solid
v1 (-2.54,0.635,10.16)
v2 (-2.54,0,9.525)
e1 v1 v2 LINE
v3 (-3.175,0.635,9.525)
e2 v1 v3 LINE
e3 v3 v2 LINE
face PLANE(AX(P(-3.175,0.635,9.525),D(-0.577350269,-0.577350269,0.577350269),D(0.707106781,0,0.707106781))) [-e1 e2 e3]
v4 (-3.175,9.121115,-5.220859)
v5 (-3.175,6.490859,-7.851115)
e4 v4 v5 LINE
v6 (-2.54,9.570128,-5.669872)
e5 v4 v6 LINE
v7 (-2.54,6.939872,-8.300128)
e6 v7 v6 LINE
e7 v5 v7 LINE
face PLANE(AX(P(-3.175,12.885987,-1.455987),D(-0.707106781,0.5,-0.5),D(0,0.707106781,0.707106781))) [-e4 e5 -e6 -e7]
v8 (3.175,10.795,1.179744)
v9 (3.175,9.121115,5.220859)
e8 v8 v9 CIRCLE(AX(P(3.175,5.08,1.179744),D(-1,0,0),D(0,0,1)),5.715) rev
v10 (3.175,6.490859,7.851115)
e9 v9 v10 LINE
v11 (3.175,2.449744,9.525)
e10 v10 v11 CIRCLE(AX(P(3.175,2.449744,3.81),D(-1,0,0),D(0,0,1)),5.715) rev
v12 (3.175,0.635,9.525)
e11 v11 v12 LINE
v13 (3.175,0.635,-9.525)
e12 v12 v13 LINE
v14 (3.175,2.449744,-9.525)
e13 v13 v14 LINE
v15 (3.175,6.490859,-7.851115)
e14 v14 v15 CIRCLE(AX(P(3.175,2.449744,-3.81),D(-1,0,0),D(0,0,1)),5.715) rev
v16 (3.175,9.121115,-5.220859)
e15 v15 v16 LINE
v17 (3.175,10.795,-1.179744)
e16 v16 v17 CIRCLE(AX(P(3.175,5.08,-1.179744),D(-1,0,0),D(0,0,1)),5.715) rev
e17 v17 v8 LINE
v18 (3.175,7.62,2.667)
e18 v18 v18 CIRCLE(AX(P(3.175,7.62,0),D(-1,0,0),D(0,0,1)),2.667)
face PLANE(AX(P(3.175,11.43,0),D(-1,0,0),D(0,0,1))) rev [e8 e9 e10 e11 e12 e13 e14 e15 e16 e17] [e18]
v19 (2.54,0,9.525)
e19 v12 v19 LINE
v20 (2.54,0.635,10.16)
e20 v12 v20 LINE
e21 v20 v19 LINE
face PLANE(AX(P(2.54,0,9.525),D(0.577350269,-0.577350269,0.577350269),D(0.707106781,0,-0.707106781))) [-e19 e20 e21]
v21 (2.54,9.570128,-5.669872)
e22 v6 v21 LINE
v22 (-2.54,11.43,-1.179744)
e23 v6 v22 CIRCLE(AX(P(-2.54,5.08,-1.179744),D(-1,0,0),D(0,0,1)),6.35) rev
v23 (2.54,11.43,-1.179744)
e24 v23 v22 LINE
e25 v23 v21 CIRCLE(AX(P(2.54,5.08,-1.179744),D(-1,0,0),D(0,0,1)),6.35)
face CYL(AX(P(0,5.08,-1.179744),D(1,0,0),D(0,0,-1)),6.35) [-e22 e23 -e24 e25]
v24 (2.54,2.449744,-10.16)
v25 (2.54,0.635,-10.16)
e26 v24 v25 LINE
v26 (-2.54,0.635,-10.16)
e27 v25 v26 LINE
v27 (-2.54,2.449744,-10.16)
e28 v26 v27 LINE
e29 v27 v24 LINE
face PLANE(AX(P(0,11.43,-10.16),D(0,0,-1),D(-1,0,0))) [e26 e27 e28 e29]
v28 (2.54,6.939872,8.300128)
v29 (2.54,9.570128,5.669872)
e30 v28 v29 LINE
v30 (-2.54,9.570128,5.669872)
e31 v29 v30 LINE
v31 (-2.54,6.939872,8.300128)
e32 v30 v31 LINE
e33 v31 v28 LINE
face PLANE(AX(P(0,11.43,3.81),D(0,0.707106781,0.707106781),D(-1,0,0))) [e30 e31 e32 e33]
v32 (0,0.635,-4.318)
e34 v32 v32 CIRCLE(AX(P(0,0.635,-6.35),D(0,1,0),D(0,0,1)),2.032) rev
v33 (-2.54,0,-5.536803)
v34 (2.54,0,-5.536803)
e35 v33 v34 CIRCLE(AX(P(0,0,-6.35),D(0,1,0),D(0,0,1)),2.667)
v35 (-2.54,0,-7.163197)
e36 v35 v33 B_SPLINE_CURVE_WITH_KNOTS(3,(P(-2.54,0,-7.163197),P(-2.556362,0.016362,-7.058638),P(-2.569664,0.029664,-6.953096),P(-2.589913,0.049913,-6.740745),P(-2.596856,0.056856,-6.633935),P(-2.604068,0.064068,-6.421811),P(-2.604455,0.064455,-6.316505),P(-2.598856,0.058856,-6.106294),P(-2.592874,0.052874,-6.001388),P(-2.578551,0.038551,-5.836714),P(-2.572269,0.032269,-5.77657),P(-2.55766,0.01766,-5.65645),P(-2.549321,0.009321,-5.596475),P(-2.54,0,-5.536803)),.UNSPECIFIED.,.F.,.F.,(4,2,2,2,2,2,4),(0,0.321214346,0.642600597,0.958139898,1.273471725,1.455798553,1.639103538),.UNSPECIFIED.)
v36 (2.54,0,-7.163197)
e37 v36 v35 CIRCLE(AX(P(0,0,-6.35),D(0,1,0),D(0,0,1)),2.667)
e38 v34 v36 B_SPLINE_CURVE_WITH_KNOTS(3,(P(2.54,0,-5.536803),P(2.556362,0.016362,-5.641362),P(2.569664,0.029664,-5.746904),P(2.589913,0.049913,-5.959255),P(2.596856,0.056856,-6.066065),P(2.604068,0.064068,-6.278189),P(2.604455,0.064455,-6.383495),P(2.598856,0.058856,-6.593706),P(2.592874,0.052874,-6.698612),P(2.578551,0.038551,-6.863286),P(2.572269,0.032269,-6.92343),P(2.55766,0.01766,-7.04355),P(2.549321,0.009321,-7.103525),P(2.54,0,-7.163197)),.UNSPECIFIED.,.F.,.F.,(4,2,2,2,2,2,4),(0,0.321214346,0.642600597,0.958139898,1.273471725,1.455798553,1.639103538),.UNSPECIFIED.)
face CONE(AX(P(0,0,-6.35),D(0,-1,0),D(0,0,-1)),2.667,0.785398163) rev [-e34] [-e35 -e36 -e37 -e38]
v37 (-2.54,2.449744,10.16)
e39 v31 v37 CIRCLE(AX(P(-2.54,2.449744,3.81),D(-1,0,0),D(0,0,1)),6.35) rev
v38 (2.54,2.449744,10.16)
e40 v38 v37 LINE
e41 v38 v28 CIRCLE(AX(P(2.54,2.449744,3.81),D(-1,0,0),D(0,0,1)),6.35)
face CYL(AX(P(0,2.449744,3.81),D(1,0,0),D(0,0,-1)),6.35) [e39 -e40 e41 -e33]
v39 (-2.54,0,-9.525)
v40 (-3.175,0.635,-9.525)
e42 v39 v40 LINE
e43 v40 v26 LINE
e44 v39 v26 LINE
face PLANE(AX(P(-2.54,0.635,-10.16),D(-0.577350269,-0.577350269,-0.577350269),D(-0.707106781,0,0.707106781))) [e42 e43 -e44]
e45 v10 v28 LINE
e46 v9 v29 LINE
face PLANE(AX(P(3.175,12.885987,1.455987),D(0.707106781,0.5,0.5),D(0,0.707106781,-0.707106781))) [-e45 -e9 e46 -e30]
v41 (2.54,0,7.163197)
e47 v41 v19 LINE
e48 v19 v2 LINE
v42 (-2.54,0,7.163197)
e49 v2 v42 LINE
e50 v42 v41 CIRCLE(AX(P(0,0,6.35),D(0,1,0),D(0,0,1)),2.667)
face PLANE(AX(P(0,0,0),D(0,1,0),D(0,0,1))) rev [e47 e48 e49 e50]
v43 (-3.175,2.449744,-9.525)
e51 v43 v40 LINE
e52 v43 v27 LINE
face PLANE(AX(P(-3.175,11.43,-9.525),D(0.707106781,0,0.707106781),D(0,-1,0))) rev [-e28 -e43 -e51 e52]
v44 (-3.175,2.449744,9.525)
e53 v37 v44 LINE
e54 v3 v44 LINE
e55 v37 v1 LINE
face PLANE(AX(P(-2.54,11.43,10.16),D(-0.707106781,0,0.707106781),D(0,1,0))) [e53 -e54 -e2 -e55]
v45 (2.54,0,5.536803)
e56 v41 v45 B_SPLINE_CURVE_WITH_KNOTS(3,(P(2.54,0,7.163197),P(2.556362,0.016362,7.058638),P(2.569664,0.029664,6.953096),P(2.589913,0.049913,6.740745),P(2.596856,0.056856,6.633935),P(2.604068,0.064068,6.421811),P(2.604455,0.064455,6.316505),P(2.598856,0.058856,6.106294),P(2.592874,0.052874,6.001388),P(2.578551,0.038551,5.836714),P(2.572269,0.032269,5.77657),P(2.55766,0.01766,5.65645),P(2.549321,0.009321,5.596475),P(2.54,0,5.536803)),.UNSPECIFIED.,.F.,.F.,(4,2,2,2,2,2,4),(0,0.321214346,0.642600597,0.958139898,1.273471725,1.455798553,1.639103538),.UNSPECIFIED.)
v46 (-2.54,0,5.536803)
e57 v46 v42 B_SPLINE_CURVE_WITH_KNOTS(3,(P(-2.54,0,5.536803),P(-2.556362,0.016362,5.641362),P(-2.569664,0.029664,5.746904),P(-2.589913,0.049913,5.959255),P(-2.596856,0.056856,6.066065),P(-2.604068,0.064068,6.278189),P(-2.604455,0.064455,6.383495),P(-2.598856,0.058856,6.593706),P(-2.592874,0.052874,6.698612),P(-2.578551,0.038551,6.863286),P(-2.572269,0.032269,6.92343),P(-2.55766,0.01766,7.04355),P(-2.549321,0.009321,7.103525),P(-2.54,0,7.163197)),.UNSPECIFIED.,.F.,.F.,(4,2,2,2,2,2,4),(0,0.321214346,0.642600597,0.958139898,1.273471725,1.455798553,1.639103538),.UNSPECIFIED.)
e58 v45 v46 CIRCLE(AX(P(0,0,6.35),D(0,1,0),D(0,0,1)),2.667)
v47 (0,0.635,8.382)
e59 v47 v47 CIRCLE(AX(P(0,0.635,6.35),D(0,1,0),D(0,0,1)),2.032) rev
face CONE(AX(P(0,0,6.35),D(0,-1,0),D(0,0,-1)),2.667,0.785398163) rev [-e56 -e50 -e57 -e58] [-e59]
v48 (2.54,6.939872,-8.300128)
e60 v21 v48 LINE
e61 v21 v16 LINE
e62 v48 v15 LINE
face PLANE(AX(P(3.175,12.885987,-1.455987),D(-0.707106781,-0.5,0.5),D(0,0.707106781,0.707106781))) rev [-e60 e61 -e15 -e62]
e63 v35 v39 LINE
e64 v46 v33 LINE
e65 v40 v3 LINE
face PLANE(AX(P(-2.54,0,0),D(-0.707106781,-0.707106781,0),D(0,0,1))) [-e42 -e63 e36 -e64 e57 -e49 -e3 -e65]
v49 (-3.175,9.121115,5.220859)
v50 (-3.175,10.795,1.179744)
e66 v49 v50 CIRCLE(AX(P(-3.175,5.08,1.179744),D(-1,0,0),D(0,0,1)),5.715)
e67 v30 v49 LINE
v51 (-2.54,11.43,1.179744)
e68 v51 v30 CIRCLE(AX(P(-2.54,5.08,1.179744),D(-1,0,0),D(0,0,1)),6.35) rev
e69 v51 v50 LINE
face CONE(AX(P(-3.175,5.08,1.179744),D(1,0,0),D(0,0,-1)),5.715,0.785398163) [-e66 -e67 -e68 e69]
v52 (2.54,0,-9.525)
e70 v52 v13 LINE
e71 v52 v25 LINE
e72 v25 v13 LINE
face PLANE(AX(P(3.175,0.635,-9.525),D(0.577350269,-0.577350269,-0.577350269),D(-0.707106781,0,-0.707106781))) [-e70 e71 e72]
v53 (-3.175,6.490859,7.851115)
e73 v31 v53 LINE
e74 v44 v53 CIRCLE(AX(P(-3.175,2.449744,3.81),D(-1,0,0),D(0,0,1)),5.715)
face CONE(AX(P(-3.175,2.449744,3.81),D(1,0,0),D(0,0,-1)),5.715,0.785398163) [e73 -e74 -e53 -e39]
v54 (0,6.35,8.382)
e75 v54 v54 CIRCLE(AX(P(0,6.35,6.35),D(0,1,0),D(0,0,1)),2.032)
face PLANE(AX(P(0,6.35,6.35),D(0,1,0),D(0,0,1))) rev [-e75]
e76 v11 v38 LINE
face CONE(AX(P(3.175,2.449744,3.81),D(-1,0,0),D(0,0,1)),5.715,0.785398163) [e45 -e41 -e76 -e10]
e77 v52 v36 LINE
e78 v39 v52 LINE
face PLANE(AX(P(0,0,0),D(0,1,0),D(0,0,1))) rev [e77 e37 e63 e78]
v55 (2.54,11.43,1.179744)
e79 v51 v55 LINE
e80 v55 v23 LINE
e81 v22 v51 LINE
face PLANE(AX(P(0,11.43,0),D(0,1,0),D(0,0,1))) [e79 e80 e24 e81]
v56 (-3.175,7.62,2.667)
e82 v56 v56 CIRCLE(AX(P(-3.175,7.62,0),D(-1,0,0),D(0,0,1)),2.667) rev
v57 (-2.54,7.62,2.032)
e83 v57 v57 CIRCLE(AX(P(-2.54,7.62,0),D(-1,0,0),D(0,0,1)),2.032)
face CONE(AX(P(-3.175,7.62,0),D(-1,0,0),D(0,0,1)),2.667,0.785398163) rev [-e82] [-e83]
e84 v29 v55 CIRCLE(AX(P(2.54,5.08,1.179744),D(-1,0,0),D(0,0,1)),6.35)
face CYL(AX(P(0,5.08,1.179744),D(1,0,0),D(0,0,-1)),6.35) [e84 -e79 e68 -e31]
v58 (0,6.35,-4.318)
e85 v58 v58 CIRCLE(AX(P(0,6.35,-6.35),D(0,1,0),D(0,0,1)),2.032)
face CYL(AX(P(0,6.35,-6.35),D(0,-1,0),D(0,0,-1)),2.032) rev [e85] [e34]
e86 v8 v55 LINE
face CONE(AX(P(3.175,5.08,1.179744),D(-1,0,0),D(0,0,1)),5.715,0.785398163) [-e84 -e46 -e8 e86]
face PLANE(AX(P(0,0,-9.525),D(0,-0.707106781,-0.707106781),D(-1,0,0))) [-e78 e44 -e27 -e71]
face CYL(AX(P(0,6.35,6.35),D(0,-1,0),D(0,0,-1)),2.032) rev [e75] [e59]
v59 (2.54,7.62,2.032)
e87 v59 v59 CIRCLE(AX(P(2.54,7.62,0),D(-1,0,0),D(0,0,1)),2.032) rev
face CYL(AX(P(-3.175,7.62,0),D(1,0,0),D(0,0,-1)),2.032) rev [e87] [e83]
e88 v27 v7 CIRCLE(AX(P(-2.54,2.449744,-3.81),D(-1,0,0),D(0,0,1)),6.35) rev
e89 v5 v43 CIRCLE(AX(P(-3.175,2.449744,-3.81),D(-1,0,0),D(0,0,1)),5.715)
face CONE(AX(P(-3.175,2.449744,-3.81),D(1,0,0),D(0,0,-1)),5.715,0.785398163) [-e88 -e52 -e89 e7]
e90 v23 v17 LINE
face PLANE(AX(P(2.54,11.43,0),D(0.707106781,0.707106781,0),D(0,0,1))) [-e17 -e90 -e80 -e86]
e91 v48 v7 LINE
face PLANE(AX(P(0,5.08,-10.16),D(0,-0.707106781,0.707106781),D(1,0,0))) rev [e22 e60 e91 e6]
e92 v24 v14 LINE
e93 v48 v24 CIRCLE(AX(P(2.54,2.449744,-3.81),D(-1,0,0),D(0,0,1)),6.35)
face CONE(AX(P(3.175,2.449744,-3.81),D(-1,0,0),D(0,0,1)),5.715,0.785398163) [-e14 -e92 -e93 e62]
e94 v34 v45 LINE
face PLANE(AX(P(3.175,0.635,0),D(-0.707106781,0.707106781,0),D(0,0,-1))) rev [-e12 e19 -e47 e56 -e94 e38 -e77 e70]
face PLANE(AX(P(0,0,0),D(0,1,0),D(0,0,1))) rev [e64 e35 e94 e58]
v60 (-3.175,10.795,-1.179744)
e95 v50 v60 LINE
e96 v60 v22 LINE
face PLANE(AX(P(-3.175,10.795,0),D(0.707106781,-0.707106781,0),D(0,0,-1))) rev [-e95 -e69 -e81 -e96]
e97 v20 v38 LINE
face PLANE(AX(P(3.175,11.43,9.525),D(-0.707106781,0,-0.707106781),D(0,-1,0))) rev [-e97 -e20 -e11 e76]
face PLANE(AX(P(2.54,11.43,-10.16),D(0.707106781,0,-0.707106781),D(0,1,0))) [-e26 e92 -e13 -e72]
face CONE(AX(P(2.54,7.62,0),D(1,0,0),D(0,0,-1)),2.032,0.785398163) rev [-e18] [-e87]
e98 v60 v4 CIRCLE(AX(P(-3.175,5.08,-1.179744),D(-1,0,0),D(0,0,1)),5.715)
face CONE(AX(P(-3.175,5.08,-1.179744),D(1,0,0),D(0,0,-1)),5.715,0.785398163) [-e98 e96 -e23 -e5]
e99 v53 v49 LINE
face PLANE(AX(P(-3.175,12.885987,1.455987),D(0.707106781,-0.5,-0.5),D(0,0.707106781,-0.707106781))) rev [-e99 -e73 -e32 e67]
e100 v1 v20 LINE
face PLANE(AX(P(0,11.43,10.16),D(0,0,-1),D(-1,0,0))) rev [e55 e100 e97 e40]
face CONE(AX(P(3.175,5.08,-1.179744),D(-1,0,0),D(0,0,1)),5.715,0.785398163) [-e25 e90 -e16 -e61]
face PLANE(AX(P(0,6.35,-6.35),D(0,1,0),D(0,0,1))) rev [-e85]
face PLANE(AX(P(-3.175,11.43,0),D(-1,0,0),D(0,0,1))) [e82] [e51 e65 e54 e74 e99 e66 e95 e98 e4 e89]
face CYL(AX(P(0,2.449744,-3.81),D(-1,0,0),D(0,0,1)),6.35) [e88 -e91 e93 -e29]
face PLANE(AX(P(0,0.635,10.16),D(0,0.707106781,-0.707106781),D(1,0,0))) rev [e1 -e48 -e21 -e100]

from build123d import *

# Parameters (mm, degrees)
SKETCH1_W           = 6.35
SKETCH1_H           = 20.32
SKETCH1_R           = 2.032
BOSS_EXTRUDE1_DEPTH = 11.43
SKETCH1_3_R         = 2.032
CUT_EXTRUDE1_DEPTH  = 6.35
SKETCH2_R           = 2.032
CUT_EXTRUDE2_DEPTH  = 17.558774109
CHAMFER1_SIZE       = 6.35
FILLET1_R           = 6.35
FILLET2_R           = 6.35
CHAMFER2_SIZE       = 0.635
CHAMFER3_SIZE       = 0.635


with BuildPart() as part:
    # Sketch1 → Boss-Extrude1 (new body)
    # profile 1 of 3: a face of its own
    with BuildSketch(Plane(origin=(0, 0, 0), x_dir=(1, 0, 0), z_dir=(0, 1, 0))):
        Rectangle(SKETCH1_W, SKETCH1_H)
        with Locations((0, -6.35)):
            Circle(SKETCH1_R, mode=Mode.SUBTRACT)
        with Locations((0, 6.35)):
            Circle(SKETCH1_R, mode=Mode.SUBTRACT)
    # profile 2 of 3: a face of its own
    with BuildSketch(Plane(origin=(0, 0, 0), x_dir=(1, 0, 0), z_dir=(0, 1, 0))):
        with Locations((0, -6.35)):
            Circle(SKETCH1_R)
    # profile 3 of 3: a face of its own
    with BuildSketch(Plane(origin=(0, 0, 0), x_dir=(1, 0, 0), z_dir=(0, 1, 0))):
        with Locations((0, 6.35)):
            Circle(SKETCH1_R)
    extrude(amount=BOSS_EXTRUDE1_DEPTH)

    # Sketch1<3> → Cut-Extrude1 (cut)
    with BuildSketch(Plane(origin=(0, 0, 0), x_dir=(1, 0, 0), z_dir=(0, 1, 0))):
        with Locations(Location((0, 6.35, 0), (0, 0, 270))):
            Circle(SKETCH1_3_R)
        with Locations(Location((0, -6.35, 0), (0, 0, 270))):
            Circle(SKETCH1_3_R)
    extrude(amount=CUT_EXTRUDE1_DEPTH, mode=Mode.SUBTRACT)

    # Sketch2 → Cut-Extrude2 (cut, through all)
    with BuildSketch(Plane(origin=(3.175, 0, 0), x_dir=(0, 0, -1), z_dir=(1, 0, 0))):
        with Locations((0, 7.62)):
            Circle(SKETCH2_R)
    extrude(amount=-CUT_EXTRUDE2_DEPTH, mode=Mode.SUBTRACT)

    # Chamfer1
    chamfer1_edges = [part.edges().sort_by_distance(p)[0] for p in [
        (0, 11.43, -10.16),
        (0, 11.43, 10.16),
    ]]
    chamfer(chamfer1_edges, length=CHAMFER1_SIZE)

    # Fillet1
    fillet1_edges = [part.edges().sort_by_distance(p)[0] for p in [
        (0, 11.43, 3.81),
        (0, 11.43, -3.81),
    ]]
    fillet(fillet1_edges, radius=FILLET1_R)

    # Fillet2
    fillet2_edges = [part.edges().sort_by_distance(p)[0] for p in [
        (0, 5.08, -10.16),
        (0, 5.08, 10.16),
    ]]
    fillet(fillet2_edges, radius=FILLET2_R)

    # Chamfer2
    chamfer2_edges = [part.edges().sort_by_distance(p)[0] for p in [
        (3.175, 11.43, 0),
        (-3.175, 11.43, 0),
        (-3.175, 8.255, -6.985),
        (-3.175, 10.946635031, 3.609783674),
        (-3.175, 10.946635031, -3.609783674),
        (3.175, 8.255, 6.985),
        (3.175, 10.946635031, 3.609783674),
        (3.175, 10.946635031, -3.609783674),
        (-3.175, 0, 0),
        (-3.175, 1.224871939, -10.16),
        (3.175, 1.224871939, -10.16),
        (3.175, 8.255, -6.985),
        (3.175, 1.224871939, 10.16),
        (3.175, 4.879783674, 9.676635031),
        (3.175, 4.879783674, -9.676635031),
        (-3.175, 1.224871939, 10.16),
        (0, 0, -10.16),
        (-3.175, 8.255, 6.985),
        (-3.175, 4.879783674, 9.676635031),
        (-3.175, 4.879783674, -9.676635031),
        (3.175, 0, 0),
        (0, 0, 10.16),
    ]]
    chamfer(chamfer2_edges, length=CHAMFER2_SIZE)

    # Chamfer3
    # the kernel refuses this chamfer: 0.635 mm, written as the material it takes off along each edge
    with BuildSketch(Plane(origin=(0, 0, 6.35), x_dir=(0, 0, 1), z_dir=(-1, 0, 0))) as chamfer3_piece_1:
        Polygon((2.032 + CHAMFER3_SIZE, 0), (2.032, CHAMFER3_SIZE), (2.032, 0), align=None)
    revolve(axis=Axis((0, 0, 6.35), (0, 1, 0)), mode=Mode.SUBTRACT)
    with BuildSketch(Plane(origin=(0, 0, -6.35), x_dir=(0, 0, 1), z_dir=(-1, 0, 0))) as chamfer3_piece_2:
        Polygon((2.032 + CHAMFER3_SIZE, 0), (2.032, CHAMFER3_SIZE), (2.032, 0), align=None)
    revolve(axis=Axis((0, 0, -6.35), (0, 1, 0)), mode=Mode.SUBTRACT)
    with BuildSketch(Plane(origin=(-3.175, 7.62, 0), x_dir=(0, 0, -1), z_dir=(0, -1, 0))) as chamfer3_piece_3:
        Polygon((2.032 + CHAMFER3_SIZE, 0), (2.032, CHAMFER3_SIZE), (2.032, 0), align=None)
    revolve(axis=Axis((-3.175, 7.62, 0), (1, 0, 0)), mode=Mode.SUBTRACT)
    with BuildSketch(Plane(origin=(3.175, 7.62, 0), x_dir=(0, 0, -1), z_dir=(0, -1, 0))) as chamfer3_piece_4:
        Polygon((2.032, -CHAMFER3_SIZE), (2.032 + CHAMFER3_SIZE, 0), (2.032, 0), align=None)
    revolve(axis=Axis((3.175, 7.62, 0), (1, 0, 0)), mode=Mode.SUBTRACT)


solid = part.part
